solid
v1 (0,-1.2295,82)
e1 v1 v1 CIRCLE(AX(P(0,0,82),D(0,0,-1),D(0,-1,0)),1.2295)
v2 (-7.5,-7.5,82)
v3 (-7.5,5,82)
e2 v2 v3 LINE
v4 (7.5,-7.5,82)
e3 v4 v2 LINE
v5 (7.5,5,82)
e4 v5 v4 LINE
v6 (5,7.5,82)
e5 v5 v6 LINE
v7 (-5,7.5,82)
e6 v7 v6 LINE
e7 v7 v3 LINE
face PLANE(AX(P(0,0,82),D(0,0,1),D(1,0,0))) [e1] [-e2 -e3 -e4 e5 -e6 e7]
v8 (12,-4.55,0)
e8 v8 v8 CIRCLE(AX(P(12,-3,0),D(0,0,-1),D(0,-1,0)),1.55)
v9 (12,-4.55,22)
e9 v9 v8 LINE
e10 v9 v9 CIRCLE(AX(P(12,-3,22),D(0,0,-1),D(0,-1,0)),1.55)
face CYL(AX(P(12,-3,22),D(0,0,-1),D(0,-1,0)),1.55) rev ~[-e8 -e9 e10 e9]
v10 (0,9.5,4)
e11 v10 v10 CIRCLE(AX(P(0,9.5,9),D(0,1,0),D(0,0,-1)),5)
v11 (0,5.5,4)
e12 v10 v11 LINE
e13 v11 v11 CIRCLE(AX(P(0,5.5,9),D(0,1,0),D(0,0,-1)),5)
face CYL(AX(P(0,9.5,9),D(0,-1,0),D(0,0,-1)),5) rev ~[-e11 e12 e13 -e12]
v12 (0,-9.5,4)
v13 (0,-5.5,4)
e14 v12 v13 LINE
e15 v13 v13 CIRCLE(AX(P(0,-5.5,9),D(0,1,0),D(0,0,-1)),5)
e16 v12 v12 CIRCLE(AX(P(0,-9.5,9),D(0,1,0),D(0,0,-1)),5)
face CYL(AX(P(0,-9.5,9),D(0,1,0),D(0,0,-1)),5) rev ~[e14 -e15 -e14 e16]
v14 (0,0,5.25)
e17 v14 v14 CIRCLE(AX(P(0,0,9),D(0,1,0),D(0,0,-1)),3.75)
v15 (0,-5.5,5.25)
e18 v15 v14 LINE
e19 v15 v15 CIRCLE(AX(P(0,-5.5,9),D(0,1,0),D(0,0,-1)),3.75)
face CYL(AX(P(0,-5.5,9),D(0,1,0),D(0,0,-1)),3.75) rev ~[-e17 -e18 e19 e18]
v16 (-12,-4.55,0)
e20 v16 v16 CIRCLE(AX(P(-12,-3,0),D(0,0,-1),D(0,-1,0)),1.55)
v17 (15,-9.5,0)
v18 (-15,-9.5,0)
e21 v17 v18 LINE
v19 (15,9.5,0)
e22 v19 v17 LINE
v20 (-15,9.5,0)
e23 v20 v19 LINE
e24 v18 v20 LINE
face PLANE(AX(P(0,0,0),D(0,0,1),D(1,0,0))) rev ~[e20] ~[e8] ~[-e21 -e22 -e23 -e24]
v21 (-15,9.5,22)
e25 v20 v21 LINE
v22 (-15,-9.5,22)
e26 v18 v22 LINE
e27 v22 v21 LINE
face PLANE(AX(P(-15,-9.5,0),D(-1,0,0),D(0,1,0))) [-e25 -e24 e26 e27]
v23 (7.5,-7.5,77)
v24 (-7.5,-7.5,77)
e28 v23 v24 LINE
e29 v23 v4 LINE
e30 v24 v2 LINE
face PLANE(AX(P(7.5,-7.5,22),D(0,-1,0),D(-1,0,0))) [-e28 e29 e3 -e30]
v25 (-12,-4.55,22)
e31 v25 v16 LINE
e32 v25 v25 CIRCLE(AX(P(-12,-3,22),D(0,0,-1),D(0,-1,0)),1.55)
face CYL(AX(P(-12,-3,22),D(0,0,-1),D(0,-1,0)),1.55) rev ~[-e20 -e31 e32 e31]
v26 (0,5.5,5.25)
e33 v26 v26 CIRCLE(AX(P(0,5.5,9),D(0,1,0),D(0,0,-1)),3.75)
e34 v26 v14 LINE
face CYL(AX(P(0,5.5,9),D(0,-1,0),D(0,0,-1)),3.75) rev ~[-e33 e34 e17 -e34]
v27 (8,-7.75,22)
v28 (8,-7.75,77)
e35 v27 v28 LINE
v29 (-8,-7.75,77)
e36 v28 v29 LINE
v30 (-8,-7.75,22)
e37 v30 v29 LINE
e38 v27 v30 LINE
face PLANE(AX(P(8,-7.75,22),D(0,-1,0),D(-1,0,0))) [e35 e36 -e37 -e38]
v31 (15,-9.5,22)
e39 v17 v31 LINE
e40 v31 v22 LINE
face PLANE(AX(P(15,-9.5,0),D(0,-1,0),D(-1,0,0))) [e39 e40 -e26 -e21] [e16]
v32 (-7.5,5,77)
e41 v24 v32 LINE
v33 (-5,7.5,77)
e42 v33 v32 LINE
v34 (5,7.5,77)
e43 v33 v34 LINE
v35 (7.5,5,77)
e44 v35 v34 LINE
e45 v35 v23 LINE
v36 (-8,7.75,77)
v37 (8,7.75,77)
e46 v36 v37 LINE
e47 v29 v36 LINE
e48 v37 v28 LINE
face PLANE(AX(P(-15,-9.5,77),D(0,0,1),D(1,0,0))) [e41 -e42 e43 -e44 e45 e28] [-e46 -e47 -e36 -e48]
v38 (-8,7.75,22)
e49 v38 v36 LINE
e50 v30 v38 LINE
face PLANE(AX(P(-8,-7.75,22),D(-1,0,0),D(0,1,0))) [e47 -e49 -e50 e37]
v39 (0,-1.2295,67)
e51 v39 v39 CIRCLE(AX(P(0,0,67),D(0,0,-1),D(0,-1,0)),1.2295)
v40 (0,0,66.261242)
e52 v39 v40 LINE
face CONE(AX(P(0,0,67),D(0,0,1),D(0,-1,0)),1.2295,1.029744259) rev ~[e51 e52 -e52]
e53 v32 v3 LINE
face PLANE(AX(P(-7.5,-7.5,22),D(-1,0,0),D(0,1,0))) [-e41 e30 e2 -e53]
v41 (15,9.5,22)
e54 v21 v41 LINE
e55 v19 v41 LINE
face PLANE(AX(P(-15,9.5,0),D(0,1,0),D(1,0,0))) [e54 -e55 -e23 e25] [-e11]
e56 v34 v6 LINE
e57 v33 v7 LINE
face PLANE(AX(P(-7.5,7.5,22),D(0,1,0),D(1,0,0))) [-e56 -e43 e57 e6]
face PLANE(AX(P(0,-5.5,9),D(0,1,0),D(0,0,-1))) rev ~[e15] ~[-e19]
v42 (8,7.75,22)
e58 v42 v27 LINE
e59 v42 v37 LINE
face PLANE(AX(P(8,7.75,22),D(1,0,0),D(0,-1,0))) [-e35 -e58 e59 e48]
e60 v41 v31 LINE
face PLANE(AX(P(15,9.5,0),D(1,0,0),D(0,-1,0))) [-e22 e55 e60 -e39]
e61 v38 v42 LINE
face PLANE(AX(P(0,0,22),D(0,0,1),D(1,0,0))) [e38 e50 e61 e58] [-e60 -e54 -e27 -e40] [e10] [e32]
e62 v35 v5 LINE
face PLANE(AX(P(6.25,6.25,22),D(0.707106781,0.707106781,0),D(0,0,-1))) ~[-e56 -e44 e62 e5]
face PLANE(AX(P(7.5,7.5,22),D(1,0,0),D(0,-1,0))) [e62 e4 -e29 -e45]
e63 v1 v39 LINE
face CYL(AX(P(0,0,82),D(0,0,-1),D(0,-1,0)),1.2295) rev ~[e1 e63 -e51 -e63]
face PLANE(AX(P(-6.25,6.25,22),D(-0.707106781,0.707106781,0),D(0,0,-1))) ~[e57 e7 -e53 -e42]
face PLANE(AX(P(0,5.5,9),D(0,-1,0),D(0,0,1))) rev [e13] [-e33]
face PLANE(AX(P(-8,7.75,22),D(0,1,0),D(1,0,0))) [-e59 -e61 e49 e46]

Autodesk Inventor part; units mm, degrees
ref_plane "YZ Plane" through (0, 0, 0) normal (1, 0, 0) x (0, 1, 0)
ref_plane "XZ Plane" through (0, 0, 0) normal (0, 1, 0) x (-1, 0, 0)
ref_plane "XY Plane" through (0, 0, 0) normal (0, 0, 1) x (1, 0, 0)
sketch "Skizze1" plane through (0, 0, 0) normal (0, 0, 1) x (1, 0, 0)
  line L0 (15, -9.5) -> (-15, -9.5)
  line L1 (-15, -9.5) -> (-15, 9.5)
  line L2 (-15, 9.5) -> (15, 9.5)
  line L3 (15, 9.5) -> (15, -9.5)
  line L4 (15, -9.5) -> (-15, 9.5) construction
  line L5 (-15, -9.5) -> (15, 9.5) construction
  point P0 (0, 0)
  dimension "d0" = 30
  dimension "d1" = 19
extrude "Extrusion1" add sketch "Skizze1" along normal blind 22
sketch "Skizze7" plane through (0, 0, 22) normal (0, 0, 1) x (1, 0, 0)
  line L0 (-7.5, -7.5) -> (-7.5, 7.5)
  line L1 (-7.5, 7.5) -> (7.5, 7.5)
  line L2 (7.5, 7.5) -> (7.5, -7.5)
  line L3 (7.5, -7.5) -> (-7.5, -7.5)
  line L4 (15, -9.5) -> (15, 9.5) projected
  point P0 (0, 0)
  point P1 (0, -7.5)
  point P2 (7.5, 0)
  point P3 (15, 0)
  dimension "d36" = 15
  dimension "d37" = 15
extrude "Extrusion3" add sketch "Skizze7" along normal blind 60
chamfer "Fasen1" distance 2.5 angle 45 2 edges at (-7.5, 7.5, 52) (7.5, 7.5, 52)
sketch "Skizze2" plane through (-15, -9.5, 22) normal (0, 0, 1) x (1, 0, 0)
  line L0 (7, 17.25) -> (23, 17.25)
  line L1 (23, 17.25) -> (23, 1.75)
  line L2 (23, 1.75) -> (7, 1.75)
  line L3 (7, 1.75) -> (7, 17.25)
  line L4 (0, 0) -> (30, 0) projected
  point P0 (15, 9.5)
  point P1 (15, 1.75)
  point P2 (15, 0)
  point P3 (7, 9.5)
  dimension "d4" = 16
  dimension "d7" = 15.5
extrude "Extrusion2" add sketch "Skizze2" along normal blind 55
sketch "Skizze3" plane through (-15, -9.5, 82) normal (0, 0, 1) x (1, 0, 0)
  line L0 (23, 1.75) -> (23, 17.25) projected
  line L1 (23, 17.25) -> (7, 17.25) projected
  point P0 (15, 9.5)
  point P1 (15, 9.5)
  point P2 (23, 9.5)
  point P3 (15, 17.25)
hole "Bohrung1" at (0, 0, 82) direction (0, 0, -1) diameter 2.459 depth 15 tip angle 118 thread size "M3x0.5" class "6H" standard "ISO Metric profile"
sketch "Skizze4" plane through (-15, -9.5, 0) normal (0, -1, 0) x (1, 0, 0)
  line L0 (0, 0) -> (30, 0) projected
  line L1 (7, 77) -> (23, 77) projected
  line L2 (7.5, 82) -> (22.5, 82) projected
  point P0 (15, 0)
  point P1 (15, 9)
  point P2 (15, 0)
  dimension "d43" = 73
hole "Bohrung2" at (0, -9.5, 9) direction (0, 1, 0) diameter 7.5 depth 9.5 counterbore diameter 10 counterbore depth 4
mirror "Spiegeln1" about plane through (0, 0, 0) normal (0, 1, 0) of "Bohrung2"
sketch "Skizze5" plane through (0, 0, 22) normal (0, 0, 1) x (1, 0, 0)
  circle A0 centre (0, 0) radius 1.2295 projected
  line L0 (15, 9.5) -> (-15, 9.5) projected
  line L1 (-15, -9.5) -> (15, -9.5) projected
  point P0 (12, -3)
  point P1 (-12, -3)
  dimension "d30" = 24
  dimension "d31" = 12
  dimension "d34" = 6.5
  dimension "d35" = 6.5
hole "Bohrung3" at (12, -3, 22) at (-12, -3, 22) direction (0, 0, -1) diameter 3.1 depth 22
properties part number "Lagerbock" material "Stahl, galvanisiert"
